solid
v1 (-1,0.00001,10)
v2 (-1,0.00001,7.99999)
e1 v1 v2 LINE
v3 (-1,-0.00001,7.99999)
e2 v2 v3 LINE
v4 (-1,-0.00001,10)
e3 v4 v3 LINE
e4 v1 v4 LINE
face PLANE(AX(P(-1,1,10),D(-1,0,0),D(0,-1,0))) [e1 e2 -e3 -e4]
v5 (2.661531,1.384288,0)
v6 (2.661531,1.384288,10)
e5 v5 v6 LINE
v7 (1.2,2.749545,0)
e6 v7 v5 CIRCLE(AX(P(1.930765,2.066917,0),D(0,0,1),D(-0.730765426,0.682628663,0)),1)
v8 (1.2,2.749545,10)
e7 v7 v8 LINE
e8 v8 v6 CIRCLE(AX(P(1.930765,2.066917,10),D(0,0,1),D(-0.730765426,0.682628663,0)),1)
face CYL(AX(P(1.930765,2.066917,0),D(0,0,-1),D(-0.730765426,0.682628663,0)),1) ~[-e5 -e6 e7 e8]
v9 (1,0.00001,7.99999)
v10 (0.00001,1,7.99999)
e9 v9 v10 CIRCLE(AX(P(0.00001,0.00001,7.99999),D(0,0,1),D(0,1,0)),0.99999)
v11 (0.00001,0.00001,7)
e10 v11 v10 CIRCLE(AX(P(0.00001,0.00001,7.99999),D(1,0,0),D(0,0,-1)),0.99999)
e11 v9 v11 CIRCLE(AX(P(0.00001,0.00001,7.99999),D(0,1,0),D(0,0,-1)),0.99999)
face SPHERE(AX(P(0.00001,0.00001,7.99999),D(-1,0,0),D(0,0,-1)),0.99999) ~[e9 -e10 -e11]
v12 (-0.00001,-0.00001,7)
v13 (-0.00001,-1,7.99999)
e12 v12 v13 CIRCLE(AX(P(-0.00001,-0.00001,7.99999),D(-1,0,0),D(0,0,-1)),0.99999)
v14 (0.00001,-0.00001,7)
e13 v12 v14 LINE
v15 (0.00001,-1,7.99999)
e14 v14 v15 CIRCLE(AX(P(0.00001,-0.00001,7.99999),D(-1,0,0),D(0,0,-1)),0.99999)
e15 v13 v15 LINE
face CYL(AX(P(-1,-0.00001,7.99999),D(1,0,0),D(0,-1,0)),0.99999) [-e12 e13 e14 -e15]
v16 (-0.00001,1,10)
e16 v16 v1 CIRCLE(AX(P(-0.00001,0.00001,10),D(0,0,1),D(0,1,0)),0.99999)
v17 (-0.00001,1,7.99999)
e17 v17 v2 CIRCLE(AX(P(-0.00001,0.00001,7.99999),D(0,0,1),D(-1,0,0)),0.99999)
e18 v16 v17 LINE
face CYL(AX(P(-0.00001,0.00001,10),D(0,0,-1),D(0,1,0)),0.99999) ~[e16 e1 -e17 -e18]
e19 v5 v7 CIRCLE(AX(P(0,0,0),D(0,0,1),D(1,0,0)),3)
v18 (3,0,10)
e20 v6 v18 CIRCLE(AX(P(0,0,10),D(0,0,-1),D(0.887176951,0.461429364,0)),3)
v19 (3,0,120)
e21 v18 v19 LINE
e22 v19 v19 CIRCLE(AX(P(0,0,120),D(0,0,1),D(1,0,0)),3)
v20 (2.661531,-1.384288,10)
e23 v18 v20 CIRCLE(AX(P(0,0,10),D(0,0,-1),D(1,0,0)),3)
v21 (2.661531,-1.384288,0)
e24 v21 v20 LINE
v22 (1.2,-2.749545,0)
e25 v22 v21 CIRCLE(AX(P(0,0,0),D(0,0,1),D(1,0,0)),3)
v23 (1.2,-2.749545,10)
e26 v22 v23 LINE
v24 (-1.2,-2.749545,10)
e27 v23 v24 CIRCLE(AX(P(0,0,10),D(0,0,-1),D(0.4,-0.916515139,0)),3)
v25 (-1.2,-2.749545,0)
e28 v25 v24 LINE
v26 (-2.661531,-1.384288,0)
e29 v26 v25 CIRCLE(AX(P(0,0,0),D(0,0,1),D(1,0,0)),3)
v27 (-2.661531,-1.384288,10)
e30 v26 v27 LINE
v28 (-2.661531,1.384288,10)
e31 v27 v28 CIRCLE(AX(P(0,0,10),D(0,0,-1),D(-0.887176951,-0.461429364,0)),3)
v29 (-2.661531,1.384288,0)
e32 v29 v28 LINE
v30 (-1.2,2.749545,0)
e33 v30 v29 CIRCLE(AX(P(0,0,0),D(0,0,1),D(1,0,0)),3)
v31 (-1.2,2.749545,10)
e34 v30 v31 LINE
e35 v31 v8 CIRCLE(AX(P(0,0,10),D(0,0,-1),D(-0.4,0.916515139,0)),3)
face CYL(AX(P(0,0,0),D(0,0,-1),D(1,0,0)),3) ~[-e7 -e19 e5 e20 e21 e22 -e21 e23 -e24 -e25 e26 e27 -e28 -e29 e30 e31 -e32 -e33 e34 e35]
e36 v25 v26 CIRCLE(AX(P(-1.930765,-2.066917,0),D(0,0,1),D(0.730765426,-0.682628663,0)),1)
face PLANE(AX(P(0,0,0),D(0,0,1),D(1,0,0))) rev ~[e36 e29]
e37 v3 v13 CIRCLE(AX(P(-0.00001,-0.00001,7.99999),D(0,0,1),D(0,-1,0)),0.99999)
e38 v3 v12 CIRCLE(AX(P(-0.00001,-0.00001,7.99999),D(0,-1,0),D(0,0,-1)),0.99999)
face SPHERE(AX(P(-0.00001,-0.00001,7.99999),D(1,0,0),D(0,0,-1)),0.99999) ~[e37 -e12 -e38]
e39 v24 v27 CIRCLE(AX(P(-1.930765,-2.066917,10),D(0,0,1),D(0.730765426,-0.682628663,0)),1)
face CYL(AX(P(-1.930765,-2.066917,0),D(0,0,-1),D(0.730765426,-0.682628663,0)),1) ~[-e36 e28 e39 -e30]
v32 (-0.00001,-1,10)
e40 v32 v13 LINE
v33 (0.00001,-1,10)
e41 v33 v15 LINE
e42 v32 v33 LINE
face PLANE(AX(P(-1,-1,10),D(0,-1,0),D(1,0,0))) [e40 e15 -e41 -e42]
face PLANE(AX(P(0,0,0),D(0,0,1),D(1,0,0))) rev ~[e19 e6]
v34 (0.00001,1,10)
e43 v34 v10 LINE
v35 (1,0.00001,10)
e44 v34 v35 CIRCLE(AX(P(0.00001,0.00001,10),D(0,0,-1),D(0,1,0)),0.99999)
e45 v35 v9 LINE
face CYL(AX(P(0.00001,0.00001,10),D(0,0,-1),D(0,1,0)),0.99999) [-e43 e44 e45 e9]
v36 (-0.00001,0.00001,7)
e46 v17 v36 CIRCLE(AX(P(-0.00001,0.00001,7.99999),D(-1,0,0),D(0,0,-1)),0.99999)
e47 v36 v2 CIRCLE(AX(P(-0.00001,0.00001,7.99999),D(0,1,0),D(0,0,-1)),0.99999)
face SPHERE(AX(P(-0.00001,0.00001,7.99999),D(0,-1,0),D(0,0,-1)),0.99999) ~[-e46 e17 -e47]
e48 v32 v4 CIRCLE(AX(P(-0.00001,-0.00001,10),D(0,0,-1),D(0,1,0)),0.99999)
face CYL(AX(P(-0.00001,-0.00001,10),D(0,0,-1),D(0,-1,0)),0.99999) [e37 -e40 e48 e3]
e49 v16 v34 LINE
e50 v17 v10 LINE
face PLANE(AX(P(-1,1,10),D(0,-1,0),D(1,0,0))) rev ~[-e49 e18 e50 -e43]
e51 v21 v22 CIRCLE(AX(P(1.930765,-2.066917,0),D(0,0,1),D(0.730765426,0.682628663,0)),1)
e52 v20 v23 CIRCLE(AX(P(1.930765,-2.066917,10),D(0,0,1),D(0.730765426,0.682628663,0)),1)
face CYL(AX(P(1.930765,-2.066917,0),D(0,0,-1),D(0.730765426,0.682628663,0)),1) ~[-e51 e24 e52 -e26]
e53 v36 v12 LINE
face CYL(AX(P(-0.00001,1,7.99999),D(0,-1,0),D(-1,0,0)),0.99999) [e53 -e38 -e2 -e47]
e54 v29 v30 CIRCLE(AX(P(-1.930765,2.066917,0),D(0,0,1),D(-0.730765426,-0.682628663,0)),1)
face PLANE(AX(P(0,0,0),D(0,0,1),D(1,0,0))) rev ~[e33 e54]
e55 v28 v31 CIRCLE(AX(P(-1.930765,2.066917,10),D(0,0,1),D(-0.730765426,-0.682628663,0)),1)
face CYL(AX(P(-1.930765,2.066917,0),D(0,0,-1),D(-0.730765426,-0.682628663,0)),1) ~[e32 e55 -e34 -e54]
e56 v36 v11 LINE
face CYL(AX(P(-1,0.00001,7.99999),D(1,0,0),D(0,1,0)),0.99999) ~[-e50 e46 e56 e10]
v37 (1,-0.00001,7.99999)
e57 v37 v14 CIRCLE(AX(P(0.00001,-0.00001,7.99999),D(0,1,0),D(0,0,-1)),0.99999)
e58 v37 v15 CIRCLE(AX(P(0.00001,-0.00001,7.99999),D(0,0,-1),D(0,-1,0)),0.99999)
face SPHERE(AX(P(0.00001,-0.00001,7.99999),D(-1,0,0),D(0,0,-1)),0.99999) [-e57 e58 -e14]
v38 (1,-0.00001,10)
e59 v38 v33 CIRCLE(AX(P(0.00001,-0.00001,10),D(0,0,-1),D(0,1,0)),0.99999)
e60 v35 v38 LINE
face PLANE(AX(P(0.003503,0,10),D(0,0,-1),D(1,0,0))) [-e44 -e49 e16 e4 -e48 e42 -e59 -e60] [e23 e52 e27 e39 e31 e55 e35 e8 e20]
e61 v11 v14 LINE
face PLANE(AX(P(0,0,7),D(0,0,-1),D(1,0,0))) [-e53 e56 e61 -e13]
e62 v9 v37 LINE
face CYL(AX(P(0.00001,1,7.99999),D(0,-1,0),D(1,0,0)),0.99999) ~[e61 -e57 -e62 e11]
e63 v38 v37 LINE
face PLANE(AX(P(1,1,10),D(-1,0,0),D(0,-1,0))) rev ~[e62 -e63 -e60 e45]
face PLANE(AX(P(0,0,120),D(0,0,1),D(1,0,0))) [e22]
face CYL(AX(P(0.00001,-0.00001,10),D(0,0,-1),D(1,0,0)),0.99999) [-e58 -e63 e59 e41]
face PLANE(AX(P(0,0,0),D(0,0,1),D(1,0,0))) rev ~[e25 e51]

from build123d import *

# Parameters (mm, degrees)
F0_R     = 3
F1_DEPTH = 120
F3_DEPTH = 10
F4_W     = 2
F4_H     = 2
F5_DEPTH = 3
F6_R     = 0.99999


# Not quite as in the source:
# - a fillet or chamfer is up to 0.001 mm smaller than in the source, because OpenCascade refuses the exact size


with BuildPart() as f1:
    # F0 (on Top) → F1 (new body)
    with BuildSketch(Plane.XY):
        Circle(F0_R)
    extrude(amount=F1_DEPTH)

    # F2 (on face) → F3 (cut)
    with BuildSketch(Plane(origin=(0, 0, 0), x_dir=(1, 0, 0), z_dir=(0, 0, -1))):
        with BuildLine():
            ThreePointArc((-1.2, 2.749545417), (-1.2481367635, 1.3361513276), (-2.6615308529, 1.384288091))
            ThreePointArc((-2.6615308529, 1.384288091), (-3, 0), (-2.6615308529, -1.384288091))
            ThreePointArc((-2.6615308529, -1.384288091), (-1.2481367635, -1.3361513276), (-1.2, -2.749545417))
            ThreePointArc((-1.2, -2.749545417), (0, -3), (1.2, -2.749545417))
            ThreePointArc((1.2, -2.749545417), (1.2481367635, -1.3361513276), (2.6615308529, -1.384288091))
            ThreePointArc((2.6615308529, -1.384288091), (2.9141544707, -0.7125333119), (3, 0))
            ThreePointArc((3, 0), (2.9141544707, 0.7125333119), (2.6615308529, 1.384288091))
            ThreePointArc((2.6615308529, 1.384288091), (1.2481367635, 1.3361513276), (1.2, 2.749545417))
            ThreePointArc((1.2, 2.749545417), (0, 3), (-1.2, 2.749545417))
        make_face()
    extrude(amount=-F3_DEPTH, mode=Mode.SUBTRACT)

    # F4 (on face) → F5 (join)
    with BuildSketch(Plane(origin=(0, 0, 10), x_dir=(1, 0, 0), z_dir=(0, 0, -1))):
        Rectangle(F4_W, F4_H)
    extrude(amount=F5_DEPTH)

    # F6 (radius 1 in the source; OpenCascade refuses exactly that, so slightly less here)
    f6_edges = [f1.edges().sort_by_distance(p)[0] for p in [
        (0, -1, 7),
        (-1, 0, 7),
        (0, 1, 7),
        (1, 0, 7),
        (1, -1, 8.5),
        (1, 1, 8.5),
        (-1, -1, 8.5),
        (-1, 1, 8.5),
    ]]
    fillet(f6_edges, radius=F6_R)


solid = f1.part
